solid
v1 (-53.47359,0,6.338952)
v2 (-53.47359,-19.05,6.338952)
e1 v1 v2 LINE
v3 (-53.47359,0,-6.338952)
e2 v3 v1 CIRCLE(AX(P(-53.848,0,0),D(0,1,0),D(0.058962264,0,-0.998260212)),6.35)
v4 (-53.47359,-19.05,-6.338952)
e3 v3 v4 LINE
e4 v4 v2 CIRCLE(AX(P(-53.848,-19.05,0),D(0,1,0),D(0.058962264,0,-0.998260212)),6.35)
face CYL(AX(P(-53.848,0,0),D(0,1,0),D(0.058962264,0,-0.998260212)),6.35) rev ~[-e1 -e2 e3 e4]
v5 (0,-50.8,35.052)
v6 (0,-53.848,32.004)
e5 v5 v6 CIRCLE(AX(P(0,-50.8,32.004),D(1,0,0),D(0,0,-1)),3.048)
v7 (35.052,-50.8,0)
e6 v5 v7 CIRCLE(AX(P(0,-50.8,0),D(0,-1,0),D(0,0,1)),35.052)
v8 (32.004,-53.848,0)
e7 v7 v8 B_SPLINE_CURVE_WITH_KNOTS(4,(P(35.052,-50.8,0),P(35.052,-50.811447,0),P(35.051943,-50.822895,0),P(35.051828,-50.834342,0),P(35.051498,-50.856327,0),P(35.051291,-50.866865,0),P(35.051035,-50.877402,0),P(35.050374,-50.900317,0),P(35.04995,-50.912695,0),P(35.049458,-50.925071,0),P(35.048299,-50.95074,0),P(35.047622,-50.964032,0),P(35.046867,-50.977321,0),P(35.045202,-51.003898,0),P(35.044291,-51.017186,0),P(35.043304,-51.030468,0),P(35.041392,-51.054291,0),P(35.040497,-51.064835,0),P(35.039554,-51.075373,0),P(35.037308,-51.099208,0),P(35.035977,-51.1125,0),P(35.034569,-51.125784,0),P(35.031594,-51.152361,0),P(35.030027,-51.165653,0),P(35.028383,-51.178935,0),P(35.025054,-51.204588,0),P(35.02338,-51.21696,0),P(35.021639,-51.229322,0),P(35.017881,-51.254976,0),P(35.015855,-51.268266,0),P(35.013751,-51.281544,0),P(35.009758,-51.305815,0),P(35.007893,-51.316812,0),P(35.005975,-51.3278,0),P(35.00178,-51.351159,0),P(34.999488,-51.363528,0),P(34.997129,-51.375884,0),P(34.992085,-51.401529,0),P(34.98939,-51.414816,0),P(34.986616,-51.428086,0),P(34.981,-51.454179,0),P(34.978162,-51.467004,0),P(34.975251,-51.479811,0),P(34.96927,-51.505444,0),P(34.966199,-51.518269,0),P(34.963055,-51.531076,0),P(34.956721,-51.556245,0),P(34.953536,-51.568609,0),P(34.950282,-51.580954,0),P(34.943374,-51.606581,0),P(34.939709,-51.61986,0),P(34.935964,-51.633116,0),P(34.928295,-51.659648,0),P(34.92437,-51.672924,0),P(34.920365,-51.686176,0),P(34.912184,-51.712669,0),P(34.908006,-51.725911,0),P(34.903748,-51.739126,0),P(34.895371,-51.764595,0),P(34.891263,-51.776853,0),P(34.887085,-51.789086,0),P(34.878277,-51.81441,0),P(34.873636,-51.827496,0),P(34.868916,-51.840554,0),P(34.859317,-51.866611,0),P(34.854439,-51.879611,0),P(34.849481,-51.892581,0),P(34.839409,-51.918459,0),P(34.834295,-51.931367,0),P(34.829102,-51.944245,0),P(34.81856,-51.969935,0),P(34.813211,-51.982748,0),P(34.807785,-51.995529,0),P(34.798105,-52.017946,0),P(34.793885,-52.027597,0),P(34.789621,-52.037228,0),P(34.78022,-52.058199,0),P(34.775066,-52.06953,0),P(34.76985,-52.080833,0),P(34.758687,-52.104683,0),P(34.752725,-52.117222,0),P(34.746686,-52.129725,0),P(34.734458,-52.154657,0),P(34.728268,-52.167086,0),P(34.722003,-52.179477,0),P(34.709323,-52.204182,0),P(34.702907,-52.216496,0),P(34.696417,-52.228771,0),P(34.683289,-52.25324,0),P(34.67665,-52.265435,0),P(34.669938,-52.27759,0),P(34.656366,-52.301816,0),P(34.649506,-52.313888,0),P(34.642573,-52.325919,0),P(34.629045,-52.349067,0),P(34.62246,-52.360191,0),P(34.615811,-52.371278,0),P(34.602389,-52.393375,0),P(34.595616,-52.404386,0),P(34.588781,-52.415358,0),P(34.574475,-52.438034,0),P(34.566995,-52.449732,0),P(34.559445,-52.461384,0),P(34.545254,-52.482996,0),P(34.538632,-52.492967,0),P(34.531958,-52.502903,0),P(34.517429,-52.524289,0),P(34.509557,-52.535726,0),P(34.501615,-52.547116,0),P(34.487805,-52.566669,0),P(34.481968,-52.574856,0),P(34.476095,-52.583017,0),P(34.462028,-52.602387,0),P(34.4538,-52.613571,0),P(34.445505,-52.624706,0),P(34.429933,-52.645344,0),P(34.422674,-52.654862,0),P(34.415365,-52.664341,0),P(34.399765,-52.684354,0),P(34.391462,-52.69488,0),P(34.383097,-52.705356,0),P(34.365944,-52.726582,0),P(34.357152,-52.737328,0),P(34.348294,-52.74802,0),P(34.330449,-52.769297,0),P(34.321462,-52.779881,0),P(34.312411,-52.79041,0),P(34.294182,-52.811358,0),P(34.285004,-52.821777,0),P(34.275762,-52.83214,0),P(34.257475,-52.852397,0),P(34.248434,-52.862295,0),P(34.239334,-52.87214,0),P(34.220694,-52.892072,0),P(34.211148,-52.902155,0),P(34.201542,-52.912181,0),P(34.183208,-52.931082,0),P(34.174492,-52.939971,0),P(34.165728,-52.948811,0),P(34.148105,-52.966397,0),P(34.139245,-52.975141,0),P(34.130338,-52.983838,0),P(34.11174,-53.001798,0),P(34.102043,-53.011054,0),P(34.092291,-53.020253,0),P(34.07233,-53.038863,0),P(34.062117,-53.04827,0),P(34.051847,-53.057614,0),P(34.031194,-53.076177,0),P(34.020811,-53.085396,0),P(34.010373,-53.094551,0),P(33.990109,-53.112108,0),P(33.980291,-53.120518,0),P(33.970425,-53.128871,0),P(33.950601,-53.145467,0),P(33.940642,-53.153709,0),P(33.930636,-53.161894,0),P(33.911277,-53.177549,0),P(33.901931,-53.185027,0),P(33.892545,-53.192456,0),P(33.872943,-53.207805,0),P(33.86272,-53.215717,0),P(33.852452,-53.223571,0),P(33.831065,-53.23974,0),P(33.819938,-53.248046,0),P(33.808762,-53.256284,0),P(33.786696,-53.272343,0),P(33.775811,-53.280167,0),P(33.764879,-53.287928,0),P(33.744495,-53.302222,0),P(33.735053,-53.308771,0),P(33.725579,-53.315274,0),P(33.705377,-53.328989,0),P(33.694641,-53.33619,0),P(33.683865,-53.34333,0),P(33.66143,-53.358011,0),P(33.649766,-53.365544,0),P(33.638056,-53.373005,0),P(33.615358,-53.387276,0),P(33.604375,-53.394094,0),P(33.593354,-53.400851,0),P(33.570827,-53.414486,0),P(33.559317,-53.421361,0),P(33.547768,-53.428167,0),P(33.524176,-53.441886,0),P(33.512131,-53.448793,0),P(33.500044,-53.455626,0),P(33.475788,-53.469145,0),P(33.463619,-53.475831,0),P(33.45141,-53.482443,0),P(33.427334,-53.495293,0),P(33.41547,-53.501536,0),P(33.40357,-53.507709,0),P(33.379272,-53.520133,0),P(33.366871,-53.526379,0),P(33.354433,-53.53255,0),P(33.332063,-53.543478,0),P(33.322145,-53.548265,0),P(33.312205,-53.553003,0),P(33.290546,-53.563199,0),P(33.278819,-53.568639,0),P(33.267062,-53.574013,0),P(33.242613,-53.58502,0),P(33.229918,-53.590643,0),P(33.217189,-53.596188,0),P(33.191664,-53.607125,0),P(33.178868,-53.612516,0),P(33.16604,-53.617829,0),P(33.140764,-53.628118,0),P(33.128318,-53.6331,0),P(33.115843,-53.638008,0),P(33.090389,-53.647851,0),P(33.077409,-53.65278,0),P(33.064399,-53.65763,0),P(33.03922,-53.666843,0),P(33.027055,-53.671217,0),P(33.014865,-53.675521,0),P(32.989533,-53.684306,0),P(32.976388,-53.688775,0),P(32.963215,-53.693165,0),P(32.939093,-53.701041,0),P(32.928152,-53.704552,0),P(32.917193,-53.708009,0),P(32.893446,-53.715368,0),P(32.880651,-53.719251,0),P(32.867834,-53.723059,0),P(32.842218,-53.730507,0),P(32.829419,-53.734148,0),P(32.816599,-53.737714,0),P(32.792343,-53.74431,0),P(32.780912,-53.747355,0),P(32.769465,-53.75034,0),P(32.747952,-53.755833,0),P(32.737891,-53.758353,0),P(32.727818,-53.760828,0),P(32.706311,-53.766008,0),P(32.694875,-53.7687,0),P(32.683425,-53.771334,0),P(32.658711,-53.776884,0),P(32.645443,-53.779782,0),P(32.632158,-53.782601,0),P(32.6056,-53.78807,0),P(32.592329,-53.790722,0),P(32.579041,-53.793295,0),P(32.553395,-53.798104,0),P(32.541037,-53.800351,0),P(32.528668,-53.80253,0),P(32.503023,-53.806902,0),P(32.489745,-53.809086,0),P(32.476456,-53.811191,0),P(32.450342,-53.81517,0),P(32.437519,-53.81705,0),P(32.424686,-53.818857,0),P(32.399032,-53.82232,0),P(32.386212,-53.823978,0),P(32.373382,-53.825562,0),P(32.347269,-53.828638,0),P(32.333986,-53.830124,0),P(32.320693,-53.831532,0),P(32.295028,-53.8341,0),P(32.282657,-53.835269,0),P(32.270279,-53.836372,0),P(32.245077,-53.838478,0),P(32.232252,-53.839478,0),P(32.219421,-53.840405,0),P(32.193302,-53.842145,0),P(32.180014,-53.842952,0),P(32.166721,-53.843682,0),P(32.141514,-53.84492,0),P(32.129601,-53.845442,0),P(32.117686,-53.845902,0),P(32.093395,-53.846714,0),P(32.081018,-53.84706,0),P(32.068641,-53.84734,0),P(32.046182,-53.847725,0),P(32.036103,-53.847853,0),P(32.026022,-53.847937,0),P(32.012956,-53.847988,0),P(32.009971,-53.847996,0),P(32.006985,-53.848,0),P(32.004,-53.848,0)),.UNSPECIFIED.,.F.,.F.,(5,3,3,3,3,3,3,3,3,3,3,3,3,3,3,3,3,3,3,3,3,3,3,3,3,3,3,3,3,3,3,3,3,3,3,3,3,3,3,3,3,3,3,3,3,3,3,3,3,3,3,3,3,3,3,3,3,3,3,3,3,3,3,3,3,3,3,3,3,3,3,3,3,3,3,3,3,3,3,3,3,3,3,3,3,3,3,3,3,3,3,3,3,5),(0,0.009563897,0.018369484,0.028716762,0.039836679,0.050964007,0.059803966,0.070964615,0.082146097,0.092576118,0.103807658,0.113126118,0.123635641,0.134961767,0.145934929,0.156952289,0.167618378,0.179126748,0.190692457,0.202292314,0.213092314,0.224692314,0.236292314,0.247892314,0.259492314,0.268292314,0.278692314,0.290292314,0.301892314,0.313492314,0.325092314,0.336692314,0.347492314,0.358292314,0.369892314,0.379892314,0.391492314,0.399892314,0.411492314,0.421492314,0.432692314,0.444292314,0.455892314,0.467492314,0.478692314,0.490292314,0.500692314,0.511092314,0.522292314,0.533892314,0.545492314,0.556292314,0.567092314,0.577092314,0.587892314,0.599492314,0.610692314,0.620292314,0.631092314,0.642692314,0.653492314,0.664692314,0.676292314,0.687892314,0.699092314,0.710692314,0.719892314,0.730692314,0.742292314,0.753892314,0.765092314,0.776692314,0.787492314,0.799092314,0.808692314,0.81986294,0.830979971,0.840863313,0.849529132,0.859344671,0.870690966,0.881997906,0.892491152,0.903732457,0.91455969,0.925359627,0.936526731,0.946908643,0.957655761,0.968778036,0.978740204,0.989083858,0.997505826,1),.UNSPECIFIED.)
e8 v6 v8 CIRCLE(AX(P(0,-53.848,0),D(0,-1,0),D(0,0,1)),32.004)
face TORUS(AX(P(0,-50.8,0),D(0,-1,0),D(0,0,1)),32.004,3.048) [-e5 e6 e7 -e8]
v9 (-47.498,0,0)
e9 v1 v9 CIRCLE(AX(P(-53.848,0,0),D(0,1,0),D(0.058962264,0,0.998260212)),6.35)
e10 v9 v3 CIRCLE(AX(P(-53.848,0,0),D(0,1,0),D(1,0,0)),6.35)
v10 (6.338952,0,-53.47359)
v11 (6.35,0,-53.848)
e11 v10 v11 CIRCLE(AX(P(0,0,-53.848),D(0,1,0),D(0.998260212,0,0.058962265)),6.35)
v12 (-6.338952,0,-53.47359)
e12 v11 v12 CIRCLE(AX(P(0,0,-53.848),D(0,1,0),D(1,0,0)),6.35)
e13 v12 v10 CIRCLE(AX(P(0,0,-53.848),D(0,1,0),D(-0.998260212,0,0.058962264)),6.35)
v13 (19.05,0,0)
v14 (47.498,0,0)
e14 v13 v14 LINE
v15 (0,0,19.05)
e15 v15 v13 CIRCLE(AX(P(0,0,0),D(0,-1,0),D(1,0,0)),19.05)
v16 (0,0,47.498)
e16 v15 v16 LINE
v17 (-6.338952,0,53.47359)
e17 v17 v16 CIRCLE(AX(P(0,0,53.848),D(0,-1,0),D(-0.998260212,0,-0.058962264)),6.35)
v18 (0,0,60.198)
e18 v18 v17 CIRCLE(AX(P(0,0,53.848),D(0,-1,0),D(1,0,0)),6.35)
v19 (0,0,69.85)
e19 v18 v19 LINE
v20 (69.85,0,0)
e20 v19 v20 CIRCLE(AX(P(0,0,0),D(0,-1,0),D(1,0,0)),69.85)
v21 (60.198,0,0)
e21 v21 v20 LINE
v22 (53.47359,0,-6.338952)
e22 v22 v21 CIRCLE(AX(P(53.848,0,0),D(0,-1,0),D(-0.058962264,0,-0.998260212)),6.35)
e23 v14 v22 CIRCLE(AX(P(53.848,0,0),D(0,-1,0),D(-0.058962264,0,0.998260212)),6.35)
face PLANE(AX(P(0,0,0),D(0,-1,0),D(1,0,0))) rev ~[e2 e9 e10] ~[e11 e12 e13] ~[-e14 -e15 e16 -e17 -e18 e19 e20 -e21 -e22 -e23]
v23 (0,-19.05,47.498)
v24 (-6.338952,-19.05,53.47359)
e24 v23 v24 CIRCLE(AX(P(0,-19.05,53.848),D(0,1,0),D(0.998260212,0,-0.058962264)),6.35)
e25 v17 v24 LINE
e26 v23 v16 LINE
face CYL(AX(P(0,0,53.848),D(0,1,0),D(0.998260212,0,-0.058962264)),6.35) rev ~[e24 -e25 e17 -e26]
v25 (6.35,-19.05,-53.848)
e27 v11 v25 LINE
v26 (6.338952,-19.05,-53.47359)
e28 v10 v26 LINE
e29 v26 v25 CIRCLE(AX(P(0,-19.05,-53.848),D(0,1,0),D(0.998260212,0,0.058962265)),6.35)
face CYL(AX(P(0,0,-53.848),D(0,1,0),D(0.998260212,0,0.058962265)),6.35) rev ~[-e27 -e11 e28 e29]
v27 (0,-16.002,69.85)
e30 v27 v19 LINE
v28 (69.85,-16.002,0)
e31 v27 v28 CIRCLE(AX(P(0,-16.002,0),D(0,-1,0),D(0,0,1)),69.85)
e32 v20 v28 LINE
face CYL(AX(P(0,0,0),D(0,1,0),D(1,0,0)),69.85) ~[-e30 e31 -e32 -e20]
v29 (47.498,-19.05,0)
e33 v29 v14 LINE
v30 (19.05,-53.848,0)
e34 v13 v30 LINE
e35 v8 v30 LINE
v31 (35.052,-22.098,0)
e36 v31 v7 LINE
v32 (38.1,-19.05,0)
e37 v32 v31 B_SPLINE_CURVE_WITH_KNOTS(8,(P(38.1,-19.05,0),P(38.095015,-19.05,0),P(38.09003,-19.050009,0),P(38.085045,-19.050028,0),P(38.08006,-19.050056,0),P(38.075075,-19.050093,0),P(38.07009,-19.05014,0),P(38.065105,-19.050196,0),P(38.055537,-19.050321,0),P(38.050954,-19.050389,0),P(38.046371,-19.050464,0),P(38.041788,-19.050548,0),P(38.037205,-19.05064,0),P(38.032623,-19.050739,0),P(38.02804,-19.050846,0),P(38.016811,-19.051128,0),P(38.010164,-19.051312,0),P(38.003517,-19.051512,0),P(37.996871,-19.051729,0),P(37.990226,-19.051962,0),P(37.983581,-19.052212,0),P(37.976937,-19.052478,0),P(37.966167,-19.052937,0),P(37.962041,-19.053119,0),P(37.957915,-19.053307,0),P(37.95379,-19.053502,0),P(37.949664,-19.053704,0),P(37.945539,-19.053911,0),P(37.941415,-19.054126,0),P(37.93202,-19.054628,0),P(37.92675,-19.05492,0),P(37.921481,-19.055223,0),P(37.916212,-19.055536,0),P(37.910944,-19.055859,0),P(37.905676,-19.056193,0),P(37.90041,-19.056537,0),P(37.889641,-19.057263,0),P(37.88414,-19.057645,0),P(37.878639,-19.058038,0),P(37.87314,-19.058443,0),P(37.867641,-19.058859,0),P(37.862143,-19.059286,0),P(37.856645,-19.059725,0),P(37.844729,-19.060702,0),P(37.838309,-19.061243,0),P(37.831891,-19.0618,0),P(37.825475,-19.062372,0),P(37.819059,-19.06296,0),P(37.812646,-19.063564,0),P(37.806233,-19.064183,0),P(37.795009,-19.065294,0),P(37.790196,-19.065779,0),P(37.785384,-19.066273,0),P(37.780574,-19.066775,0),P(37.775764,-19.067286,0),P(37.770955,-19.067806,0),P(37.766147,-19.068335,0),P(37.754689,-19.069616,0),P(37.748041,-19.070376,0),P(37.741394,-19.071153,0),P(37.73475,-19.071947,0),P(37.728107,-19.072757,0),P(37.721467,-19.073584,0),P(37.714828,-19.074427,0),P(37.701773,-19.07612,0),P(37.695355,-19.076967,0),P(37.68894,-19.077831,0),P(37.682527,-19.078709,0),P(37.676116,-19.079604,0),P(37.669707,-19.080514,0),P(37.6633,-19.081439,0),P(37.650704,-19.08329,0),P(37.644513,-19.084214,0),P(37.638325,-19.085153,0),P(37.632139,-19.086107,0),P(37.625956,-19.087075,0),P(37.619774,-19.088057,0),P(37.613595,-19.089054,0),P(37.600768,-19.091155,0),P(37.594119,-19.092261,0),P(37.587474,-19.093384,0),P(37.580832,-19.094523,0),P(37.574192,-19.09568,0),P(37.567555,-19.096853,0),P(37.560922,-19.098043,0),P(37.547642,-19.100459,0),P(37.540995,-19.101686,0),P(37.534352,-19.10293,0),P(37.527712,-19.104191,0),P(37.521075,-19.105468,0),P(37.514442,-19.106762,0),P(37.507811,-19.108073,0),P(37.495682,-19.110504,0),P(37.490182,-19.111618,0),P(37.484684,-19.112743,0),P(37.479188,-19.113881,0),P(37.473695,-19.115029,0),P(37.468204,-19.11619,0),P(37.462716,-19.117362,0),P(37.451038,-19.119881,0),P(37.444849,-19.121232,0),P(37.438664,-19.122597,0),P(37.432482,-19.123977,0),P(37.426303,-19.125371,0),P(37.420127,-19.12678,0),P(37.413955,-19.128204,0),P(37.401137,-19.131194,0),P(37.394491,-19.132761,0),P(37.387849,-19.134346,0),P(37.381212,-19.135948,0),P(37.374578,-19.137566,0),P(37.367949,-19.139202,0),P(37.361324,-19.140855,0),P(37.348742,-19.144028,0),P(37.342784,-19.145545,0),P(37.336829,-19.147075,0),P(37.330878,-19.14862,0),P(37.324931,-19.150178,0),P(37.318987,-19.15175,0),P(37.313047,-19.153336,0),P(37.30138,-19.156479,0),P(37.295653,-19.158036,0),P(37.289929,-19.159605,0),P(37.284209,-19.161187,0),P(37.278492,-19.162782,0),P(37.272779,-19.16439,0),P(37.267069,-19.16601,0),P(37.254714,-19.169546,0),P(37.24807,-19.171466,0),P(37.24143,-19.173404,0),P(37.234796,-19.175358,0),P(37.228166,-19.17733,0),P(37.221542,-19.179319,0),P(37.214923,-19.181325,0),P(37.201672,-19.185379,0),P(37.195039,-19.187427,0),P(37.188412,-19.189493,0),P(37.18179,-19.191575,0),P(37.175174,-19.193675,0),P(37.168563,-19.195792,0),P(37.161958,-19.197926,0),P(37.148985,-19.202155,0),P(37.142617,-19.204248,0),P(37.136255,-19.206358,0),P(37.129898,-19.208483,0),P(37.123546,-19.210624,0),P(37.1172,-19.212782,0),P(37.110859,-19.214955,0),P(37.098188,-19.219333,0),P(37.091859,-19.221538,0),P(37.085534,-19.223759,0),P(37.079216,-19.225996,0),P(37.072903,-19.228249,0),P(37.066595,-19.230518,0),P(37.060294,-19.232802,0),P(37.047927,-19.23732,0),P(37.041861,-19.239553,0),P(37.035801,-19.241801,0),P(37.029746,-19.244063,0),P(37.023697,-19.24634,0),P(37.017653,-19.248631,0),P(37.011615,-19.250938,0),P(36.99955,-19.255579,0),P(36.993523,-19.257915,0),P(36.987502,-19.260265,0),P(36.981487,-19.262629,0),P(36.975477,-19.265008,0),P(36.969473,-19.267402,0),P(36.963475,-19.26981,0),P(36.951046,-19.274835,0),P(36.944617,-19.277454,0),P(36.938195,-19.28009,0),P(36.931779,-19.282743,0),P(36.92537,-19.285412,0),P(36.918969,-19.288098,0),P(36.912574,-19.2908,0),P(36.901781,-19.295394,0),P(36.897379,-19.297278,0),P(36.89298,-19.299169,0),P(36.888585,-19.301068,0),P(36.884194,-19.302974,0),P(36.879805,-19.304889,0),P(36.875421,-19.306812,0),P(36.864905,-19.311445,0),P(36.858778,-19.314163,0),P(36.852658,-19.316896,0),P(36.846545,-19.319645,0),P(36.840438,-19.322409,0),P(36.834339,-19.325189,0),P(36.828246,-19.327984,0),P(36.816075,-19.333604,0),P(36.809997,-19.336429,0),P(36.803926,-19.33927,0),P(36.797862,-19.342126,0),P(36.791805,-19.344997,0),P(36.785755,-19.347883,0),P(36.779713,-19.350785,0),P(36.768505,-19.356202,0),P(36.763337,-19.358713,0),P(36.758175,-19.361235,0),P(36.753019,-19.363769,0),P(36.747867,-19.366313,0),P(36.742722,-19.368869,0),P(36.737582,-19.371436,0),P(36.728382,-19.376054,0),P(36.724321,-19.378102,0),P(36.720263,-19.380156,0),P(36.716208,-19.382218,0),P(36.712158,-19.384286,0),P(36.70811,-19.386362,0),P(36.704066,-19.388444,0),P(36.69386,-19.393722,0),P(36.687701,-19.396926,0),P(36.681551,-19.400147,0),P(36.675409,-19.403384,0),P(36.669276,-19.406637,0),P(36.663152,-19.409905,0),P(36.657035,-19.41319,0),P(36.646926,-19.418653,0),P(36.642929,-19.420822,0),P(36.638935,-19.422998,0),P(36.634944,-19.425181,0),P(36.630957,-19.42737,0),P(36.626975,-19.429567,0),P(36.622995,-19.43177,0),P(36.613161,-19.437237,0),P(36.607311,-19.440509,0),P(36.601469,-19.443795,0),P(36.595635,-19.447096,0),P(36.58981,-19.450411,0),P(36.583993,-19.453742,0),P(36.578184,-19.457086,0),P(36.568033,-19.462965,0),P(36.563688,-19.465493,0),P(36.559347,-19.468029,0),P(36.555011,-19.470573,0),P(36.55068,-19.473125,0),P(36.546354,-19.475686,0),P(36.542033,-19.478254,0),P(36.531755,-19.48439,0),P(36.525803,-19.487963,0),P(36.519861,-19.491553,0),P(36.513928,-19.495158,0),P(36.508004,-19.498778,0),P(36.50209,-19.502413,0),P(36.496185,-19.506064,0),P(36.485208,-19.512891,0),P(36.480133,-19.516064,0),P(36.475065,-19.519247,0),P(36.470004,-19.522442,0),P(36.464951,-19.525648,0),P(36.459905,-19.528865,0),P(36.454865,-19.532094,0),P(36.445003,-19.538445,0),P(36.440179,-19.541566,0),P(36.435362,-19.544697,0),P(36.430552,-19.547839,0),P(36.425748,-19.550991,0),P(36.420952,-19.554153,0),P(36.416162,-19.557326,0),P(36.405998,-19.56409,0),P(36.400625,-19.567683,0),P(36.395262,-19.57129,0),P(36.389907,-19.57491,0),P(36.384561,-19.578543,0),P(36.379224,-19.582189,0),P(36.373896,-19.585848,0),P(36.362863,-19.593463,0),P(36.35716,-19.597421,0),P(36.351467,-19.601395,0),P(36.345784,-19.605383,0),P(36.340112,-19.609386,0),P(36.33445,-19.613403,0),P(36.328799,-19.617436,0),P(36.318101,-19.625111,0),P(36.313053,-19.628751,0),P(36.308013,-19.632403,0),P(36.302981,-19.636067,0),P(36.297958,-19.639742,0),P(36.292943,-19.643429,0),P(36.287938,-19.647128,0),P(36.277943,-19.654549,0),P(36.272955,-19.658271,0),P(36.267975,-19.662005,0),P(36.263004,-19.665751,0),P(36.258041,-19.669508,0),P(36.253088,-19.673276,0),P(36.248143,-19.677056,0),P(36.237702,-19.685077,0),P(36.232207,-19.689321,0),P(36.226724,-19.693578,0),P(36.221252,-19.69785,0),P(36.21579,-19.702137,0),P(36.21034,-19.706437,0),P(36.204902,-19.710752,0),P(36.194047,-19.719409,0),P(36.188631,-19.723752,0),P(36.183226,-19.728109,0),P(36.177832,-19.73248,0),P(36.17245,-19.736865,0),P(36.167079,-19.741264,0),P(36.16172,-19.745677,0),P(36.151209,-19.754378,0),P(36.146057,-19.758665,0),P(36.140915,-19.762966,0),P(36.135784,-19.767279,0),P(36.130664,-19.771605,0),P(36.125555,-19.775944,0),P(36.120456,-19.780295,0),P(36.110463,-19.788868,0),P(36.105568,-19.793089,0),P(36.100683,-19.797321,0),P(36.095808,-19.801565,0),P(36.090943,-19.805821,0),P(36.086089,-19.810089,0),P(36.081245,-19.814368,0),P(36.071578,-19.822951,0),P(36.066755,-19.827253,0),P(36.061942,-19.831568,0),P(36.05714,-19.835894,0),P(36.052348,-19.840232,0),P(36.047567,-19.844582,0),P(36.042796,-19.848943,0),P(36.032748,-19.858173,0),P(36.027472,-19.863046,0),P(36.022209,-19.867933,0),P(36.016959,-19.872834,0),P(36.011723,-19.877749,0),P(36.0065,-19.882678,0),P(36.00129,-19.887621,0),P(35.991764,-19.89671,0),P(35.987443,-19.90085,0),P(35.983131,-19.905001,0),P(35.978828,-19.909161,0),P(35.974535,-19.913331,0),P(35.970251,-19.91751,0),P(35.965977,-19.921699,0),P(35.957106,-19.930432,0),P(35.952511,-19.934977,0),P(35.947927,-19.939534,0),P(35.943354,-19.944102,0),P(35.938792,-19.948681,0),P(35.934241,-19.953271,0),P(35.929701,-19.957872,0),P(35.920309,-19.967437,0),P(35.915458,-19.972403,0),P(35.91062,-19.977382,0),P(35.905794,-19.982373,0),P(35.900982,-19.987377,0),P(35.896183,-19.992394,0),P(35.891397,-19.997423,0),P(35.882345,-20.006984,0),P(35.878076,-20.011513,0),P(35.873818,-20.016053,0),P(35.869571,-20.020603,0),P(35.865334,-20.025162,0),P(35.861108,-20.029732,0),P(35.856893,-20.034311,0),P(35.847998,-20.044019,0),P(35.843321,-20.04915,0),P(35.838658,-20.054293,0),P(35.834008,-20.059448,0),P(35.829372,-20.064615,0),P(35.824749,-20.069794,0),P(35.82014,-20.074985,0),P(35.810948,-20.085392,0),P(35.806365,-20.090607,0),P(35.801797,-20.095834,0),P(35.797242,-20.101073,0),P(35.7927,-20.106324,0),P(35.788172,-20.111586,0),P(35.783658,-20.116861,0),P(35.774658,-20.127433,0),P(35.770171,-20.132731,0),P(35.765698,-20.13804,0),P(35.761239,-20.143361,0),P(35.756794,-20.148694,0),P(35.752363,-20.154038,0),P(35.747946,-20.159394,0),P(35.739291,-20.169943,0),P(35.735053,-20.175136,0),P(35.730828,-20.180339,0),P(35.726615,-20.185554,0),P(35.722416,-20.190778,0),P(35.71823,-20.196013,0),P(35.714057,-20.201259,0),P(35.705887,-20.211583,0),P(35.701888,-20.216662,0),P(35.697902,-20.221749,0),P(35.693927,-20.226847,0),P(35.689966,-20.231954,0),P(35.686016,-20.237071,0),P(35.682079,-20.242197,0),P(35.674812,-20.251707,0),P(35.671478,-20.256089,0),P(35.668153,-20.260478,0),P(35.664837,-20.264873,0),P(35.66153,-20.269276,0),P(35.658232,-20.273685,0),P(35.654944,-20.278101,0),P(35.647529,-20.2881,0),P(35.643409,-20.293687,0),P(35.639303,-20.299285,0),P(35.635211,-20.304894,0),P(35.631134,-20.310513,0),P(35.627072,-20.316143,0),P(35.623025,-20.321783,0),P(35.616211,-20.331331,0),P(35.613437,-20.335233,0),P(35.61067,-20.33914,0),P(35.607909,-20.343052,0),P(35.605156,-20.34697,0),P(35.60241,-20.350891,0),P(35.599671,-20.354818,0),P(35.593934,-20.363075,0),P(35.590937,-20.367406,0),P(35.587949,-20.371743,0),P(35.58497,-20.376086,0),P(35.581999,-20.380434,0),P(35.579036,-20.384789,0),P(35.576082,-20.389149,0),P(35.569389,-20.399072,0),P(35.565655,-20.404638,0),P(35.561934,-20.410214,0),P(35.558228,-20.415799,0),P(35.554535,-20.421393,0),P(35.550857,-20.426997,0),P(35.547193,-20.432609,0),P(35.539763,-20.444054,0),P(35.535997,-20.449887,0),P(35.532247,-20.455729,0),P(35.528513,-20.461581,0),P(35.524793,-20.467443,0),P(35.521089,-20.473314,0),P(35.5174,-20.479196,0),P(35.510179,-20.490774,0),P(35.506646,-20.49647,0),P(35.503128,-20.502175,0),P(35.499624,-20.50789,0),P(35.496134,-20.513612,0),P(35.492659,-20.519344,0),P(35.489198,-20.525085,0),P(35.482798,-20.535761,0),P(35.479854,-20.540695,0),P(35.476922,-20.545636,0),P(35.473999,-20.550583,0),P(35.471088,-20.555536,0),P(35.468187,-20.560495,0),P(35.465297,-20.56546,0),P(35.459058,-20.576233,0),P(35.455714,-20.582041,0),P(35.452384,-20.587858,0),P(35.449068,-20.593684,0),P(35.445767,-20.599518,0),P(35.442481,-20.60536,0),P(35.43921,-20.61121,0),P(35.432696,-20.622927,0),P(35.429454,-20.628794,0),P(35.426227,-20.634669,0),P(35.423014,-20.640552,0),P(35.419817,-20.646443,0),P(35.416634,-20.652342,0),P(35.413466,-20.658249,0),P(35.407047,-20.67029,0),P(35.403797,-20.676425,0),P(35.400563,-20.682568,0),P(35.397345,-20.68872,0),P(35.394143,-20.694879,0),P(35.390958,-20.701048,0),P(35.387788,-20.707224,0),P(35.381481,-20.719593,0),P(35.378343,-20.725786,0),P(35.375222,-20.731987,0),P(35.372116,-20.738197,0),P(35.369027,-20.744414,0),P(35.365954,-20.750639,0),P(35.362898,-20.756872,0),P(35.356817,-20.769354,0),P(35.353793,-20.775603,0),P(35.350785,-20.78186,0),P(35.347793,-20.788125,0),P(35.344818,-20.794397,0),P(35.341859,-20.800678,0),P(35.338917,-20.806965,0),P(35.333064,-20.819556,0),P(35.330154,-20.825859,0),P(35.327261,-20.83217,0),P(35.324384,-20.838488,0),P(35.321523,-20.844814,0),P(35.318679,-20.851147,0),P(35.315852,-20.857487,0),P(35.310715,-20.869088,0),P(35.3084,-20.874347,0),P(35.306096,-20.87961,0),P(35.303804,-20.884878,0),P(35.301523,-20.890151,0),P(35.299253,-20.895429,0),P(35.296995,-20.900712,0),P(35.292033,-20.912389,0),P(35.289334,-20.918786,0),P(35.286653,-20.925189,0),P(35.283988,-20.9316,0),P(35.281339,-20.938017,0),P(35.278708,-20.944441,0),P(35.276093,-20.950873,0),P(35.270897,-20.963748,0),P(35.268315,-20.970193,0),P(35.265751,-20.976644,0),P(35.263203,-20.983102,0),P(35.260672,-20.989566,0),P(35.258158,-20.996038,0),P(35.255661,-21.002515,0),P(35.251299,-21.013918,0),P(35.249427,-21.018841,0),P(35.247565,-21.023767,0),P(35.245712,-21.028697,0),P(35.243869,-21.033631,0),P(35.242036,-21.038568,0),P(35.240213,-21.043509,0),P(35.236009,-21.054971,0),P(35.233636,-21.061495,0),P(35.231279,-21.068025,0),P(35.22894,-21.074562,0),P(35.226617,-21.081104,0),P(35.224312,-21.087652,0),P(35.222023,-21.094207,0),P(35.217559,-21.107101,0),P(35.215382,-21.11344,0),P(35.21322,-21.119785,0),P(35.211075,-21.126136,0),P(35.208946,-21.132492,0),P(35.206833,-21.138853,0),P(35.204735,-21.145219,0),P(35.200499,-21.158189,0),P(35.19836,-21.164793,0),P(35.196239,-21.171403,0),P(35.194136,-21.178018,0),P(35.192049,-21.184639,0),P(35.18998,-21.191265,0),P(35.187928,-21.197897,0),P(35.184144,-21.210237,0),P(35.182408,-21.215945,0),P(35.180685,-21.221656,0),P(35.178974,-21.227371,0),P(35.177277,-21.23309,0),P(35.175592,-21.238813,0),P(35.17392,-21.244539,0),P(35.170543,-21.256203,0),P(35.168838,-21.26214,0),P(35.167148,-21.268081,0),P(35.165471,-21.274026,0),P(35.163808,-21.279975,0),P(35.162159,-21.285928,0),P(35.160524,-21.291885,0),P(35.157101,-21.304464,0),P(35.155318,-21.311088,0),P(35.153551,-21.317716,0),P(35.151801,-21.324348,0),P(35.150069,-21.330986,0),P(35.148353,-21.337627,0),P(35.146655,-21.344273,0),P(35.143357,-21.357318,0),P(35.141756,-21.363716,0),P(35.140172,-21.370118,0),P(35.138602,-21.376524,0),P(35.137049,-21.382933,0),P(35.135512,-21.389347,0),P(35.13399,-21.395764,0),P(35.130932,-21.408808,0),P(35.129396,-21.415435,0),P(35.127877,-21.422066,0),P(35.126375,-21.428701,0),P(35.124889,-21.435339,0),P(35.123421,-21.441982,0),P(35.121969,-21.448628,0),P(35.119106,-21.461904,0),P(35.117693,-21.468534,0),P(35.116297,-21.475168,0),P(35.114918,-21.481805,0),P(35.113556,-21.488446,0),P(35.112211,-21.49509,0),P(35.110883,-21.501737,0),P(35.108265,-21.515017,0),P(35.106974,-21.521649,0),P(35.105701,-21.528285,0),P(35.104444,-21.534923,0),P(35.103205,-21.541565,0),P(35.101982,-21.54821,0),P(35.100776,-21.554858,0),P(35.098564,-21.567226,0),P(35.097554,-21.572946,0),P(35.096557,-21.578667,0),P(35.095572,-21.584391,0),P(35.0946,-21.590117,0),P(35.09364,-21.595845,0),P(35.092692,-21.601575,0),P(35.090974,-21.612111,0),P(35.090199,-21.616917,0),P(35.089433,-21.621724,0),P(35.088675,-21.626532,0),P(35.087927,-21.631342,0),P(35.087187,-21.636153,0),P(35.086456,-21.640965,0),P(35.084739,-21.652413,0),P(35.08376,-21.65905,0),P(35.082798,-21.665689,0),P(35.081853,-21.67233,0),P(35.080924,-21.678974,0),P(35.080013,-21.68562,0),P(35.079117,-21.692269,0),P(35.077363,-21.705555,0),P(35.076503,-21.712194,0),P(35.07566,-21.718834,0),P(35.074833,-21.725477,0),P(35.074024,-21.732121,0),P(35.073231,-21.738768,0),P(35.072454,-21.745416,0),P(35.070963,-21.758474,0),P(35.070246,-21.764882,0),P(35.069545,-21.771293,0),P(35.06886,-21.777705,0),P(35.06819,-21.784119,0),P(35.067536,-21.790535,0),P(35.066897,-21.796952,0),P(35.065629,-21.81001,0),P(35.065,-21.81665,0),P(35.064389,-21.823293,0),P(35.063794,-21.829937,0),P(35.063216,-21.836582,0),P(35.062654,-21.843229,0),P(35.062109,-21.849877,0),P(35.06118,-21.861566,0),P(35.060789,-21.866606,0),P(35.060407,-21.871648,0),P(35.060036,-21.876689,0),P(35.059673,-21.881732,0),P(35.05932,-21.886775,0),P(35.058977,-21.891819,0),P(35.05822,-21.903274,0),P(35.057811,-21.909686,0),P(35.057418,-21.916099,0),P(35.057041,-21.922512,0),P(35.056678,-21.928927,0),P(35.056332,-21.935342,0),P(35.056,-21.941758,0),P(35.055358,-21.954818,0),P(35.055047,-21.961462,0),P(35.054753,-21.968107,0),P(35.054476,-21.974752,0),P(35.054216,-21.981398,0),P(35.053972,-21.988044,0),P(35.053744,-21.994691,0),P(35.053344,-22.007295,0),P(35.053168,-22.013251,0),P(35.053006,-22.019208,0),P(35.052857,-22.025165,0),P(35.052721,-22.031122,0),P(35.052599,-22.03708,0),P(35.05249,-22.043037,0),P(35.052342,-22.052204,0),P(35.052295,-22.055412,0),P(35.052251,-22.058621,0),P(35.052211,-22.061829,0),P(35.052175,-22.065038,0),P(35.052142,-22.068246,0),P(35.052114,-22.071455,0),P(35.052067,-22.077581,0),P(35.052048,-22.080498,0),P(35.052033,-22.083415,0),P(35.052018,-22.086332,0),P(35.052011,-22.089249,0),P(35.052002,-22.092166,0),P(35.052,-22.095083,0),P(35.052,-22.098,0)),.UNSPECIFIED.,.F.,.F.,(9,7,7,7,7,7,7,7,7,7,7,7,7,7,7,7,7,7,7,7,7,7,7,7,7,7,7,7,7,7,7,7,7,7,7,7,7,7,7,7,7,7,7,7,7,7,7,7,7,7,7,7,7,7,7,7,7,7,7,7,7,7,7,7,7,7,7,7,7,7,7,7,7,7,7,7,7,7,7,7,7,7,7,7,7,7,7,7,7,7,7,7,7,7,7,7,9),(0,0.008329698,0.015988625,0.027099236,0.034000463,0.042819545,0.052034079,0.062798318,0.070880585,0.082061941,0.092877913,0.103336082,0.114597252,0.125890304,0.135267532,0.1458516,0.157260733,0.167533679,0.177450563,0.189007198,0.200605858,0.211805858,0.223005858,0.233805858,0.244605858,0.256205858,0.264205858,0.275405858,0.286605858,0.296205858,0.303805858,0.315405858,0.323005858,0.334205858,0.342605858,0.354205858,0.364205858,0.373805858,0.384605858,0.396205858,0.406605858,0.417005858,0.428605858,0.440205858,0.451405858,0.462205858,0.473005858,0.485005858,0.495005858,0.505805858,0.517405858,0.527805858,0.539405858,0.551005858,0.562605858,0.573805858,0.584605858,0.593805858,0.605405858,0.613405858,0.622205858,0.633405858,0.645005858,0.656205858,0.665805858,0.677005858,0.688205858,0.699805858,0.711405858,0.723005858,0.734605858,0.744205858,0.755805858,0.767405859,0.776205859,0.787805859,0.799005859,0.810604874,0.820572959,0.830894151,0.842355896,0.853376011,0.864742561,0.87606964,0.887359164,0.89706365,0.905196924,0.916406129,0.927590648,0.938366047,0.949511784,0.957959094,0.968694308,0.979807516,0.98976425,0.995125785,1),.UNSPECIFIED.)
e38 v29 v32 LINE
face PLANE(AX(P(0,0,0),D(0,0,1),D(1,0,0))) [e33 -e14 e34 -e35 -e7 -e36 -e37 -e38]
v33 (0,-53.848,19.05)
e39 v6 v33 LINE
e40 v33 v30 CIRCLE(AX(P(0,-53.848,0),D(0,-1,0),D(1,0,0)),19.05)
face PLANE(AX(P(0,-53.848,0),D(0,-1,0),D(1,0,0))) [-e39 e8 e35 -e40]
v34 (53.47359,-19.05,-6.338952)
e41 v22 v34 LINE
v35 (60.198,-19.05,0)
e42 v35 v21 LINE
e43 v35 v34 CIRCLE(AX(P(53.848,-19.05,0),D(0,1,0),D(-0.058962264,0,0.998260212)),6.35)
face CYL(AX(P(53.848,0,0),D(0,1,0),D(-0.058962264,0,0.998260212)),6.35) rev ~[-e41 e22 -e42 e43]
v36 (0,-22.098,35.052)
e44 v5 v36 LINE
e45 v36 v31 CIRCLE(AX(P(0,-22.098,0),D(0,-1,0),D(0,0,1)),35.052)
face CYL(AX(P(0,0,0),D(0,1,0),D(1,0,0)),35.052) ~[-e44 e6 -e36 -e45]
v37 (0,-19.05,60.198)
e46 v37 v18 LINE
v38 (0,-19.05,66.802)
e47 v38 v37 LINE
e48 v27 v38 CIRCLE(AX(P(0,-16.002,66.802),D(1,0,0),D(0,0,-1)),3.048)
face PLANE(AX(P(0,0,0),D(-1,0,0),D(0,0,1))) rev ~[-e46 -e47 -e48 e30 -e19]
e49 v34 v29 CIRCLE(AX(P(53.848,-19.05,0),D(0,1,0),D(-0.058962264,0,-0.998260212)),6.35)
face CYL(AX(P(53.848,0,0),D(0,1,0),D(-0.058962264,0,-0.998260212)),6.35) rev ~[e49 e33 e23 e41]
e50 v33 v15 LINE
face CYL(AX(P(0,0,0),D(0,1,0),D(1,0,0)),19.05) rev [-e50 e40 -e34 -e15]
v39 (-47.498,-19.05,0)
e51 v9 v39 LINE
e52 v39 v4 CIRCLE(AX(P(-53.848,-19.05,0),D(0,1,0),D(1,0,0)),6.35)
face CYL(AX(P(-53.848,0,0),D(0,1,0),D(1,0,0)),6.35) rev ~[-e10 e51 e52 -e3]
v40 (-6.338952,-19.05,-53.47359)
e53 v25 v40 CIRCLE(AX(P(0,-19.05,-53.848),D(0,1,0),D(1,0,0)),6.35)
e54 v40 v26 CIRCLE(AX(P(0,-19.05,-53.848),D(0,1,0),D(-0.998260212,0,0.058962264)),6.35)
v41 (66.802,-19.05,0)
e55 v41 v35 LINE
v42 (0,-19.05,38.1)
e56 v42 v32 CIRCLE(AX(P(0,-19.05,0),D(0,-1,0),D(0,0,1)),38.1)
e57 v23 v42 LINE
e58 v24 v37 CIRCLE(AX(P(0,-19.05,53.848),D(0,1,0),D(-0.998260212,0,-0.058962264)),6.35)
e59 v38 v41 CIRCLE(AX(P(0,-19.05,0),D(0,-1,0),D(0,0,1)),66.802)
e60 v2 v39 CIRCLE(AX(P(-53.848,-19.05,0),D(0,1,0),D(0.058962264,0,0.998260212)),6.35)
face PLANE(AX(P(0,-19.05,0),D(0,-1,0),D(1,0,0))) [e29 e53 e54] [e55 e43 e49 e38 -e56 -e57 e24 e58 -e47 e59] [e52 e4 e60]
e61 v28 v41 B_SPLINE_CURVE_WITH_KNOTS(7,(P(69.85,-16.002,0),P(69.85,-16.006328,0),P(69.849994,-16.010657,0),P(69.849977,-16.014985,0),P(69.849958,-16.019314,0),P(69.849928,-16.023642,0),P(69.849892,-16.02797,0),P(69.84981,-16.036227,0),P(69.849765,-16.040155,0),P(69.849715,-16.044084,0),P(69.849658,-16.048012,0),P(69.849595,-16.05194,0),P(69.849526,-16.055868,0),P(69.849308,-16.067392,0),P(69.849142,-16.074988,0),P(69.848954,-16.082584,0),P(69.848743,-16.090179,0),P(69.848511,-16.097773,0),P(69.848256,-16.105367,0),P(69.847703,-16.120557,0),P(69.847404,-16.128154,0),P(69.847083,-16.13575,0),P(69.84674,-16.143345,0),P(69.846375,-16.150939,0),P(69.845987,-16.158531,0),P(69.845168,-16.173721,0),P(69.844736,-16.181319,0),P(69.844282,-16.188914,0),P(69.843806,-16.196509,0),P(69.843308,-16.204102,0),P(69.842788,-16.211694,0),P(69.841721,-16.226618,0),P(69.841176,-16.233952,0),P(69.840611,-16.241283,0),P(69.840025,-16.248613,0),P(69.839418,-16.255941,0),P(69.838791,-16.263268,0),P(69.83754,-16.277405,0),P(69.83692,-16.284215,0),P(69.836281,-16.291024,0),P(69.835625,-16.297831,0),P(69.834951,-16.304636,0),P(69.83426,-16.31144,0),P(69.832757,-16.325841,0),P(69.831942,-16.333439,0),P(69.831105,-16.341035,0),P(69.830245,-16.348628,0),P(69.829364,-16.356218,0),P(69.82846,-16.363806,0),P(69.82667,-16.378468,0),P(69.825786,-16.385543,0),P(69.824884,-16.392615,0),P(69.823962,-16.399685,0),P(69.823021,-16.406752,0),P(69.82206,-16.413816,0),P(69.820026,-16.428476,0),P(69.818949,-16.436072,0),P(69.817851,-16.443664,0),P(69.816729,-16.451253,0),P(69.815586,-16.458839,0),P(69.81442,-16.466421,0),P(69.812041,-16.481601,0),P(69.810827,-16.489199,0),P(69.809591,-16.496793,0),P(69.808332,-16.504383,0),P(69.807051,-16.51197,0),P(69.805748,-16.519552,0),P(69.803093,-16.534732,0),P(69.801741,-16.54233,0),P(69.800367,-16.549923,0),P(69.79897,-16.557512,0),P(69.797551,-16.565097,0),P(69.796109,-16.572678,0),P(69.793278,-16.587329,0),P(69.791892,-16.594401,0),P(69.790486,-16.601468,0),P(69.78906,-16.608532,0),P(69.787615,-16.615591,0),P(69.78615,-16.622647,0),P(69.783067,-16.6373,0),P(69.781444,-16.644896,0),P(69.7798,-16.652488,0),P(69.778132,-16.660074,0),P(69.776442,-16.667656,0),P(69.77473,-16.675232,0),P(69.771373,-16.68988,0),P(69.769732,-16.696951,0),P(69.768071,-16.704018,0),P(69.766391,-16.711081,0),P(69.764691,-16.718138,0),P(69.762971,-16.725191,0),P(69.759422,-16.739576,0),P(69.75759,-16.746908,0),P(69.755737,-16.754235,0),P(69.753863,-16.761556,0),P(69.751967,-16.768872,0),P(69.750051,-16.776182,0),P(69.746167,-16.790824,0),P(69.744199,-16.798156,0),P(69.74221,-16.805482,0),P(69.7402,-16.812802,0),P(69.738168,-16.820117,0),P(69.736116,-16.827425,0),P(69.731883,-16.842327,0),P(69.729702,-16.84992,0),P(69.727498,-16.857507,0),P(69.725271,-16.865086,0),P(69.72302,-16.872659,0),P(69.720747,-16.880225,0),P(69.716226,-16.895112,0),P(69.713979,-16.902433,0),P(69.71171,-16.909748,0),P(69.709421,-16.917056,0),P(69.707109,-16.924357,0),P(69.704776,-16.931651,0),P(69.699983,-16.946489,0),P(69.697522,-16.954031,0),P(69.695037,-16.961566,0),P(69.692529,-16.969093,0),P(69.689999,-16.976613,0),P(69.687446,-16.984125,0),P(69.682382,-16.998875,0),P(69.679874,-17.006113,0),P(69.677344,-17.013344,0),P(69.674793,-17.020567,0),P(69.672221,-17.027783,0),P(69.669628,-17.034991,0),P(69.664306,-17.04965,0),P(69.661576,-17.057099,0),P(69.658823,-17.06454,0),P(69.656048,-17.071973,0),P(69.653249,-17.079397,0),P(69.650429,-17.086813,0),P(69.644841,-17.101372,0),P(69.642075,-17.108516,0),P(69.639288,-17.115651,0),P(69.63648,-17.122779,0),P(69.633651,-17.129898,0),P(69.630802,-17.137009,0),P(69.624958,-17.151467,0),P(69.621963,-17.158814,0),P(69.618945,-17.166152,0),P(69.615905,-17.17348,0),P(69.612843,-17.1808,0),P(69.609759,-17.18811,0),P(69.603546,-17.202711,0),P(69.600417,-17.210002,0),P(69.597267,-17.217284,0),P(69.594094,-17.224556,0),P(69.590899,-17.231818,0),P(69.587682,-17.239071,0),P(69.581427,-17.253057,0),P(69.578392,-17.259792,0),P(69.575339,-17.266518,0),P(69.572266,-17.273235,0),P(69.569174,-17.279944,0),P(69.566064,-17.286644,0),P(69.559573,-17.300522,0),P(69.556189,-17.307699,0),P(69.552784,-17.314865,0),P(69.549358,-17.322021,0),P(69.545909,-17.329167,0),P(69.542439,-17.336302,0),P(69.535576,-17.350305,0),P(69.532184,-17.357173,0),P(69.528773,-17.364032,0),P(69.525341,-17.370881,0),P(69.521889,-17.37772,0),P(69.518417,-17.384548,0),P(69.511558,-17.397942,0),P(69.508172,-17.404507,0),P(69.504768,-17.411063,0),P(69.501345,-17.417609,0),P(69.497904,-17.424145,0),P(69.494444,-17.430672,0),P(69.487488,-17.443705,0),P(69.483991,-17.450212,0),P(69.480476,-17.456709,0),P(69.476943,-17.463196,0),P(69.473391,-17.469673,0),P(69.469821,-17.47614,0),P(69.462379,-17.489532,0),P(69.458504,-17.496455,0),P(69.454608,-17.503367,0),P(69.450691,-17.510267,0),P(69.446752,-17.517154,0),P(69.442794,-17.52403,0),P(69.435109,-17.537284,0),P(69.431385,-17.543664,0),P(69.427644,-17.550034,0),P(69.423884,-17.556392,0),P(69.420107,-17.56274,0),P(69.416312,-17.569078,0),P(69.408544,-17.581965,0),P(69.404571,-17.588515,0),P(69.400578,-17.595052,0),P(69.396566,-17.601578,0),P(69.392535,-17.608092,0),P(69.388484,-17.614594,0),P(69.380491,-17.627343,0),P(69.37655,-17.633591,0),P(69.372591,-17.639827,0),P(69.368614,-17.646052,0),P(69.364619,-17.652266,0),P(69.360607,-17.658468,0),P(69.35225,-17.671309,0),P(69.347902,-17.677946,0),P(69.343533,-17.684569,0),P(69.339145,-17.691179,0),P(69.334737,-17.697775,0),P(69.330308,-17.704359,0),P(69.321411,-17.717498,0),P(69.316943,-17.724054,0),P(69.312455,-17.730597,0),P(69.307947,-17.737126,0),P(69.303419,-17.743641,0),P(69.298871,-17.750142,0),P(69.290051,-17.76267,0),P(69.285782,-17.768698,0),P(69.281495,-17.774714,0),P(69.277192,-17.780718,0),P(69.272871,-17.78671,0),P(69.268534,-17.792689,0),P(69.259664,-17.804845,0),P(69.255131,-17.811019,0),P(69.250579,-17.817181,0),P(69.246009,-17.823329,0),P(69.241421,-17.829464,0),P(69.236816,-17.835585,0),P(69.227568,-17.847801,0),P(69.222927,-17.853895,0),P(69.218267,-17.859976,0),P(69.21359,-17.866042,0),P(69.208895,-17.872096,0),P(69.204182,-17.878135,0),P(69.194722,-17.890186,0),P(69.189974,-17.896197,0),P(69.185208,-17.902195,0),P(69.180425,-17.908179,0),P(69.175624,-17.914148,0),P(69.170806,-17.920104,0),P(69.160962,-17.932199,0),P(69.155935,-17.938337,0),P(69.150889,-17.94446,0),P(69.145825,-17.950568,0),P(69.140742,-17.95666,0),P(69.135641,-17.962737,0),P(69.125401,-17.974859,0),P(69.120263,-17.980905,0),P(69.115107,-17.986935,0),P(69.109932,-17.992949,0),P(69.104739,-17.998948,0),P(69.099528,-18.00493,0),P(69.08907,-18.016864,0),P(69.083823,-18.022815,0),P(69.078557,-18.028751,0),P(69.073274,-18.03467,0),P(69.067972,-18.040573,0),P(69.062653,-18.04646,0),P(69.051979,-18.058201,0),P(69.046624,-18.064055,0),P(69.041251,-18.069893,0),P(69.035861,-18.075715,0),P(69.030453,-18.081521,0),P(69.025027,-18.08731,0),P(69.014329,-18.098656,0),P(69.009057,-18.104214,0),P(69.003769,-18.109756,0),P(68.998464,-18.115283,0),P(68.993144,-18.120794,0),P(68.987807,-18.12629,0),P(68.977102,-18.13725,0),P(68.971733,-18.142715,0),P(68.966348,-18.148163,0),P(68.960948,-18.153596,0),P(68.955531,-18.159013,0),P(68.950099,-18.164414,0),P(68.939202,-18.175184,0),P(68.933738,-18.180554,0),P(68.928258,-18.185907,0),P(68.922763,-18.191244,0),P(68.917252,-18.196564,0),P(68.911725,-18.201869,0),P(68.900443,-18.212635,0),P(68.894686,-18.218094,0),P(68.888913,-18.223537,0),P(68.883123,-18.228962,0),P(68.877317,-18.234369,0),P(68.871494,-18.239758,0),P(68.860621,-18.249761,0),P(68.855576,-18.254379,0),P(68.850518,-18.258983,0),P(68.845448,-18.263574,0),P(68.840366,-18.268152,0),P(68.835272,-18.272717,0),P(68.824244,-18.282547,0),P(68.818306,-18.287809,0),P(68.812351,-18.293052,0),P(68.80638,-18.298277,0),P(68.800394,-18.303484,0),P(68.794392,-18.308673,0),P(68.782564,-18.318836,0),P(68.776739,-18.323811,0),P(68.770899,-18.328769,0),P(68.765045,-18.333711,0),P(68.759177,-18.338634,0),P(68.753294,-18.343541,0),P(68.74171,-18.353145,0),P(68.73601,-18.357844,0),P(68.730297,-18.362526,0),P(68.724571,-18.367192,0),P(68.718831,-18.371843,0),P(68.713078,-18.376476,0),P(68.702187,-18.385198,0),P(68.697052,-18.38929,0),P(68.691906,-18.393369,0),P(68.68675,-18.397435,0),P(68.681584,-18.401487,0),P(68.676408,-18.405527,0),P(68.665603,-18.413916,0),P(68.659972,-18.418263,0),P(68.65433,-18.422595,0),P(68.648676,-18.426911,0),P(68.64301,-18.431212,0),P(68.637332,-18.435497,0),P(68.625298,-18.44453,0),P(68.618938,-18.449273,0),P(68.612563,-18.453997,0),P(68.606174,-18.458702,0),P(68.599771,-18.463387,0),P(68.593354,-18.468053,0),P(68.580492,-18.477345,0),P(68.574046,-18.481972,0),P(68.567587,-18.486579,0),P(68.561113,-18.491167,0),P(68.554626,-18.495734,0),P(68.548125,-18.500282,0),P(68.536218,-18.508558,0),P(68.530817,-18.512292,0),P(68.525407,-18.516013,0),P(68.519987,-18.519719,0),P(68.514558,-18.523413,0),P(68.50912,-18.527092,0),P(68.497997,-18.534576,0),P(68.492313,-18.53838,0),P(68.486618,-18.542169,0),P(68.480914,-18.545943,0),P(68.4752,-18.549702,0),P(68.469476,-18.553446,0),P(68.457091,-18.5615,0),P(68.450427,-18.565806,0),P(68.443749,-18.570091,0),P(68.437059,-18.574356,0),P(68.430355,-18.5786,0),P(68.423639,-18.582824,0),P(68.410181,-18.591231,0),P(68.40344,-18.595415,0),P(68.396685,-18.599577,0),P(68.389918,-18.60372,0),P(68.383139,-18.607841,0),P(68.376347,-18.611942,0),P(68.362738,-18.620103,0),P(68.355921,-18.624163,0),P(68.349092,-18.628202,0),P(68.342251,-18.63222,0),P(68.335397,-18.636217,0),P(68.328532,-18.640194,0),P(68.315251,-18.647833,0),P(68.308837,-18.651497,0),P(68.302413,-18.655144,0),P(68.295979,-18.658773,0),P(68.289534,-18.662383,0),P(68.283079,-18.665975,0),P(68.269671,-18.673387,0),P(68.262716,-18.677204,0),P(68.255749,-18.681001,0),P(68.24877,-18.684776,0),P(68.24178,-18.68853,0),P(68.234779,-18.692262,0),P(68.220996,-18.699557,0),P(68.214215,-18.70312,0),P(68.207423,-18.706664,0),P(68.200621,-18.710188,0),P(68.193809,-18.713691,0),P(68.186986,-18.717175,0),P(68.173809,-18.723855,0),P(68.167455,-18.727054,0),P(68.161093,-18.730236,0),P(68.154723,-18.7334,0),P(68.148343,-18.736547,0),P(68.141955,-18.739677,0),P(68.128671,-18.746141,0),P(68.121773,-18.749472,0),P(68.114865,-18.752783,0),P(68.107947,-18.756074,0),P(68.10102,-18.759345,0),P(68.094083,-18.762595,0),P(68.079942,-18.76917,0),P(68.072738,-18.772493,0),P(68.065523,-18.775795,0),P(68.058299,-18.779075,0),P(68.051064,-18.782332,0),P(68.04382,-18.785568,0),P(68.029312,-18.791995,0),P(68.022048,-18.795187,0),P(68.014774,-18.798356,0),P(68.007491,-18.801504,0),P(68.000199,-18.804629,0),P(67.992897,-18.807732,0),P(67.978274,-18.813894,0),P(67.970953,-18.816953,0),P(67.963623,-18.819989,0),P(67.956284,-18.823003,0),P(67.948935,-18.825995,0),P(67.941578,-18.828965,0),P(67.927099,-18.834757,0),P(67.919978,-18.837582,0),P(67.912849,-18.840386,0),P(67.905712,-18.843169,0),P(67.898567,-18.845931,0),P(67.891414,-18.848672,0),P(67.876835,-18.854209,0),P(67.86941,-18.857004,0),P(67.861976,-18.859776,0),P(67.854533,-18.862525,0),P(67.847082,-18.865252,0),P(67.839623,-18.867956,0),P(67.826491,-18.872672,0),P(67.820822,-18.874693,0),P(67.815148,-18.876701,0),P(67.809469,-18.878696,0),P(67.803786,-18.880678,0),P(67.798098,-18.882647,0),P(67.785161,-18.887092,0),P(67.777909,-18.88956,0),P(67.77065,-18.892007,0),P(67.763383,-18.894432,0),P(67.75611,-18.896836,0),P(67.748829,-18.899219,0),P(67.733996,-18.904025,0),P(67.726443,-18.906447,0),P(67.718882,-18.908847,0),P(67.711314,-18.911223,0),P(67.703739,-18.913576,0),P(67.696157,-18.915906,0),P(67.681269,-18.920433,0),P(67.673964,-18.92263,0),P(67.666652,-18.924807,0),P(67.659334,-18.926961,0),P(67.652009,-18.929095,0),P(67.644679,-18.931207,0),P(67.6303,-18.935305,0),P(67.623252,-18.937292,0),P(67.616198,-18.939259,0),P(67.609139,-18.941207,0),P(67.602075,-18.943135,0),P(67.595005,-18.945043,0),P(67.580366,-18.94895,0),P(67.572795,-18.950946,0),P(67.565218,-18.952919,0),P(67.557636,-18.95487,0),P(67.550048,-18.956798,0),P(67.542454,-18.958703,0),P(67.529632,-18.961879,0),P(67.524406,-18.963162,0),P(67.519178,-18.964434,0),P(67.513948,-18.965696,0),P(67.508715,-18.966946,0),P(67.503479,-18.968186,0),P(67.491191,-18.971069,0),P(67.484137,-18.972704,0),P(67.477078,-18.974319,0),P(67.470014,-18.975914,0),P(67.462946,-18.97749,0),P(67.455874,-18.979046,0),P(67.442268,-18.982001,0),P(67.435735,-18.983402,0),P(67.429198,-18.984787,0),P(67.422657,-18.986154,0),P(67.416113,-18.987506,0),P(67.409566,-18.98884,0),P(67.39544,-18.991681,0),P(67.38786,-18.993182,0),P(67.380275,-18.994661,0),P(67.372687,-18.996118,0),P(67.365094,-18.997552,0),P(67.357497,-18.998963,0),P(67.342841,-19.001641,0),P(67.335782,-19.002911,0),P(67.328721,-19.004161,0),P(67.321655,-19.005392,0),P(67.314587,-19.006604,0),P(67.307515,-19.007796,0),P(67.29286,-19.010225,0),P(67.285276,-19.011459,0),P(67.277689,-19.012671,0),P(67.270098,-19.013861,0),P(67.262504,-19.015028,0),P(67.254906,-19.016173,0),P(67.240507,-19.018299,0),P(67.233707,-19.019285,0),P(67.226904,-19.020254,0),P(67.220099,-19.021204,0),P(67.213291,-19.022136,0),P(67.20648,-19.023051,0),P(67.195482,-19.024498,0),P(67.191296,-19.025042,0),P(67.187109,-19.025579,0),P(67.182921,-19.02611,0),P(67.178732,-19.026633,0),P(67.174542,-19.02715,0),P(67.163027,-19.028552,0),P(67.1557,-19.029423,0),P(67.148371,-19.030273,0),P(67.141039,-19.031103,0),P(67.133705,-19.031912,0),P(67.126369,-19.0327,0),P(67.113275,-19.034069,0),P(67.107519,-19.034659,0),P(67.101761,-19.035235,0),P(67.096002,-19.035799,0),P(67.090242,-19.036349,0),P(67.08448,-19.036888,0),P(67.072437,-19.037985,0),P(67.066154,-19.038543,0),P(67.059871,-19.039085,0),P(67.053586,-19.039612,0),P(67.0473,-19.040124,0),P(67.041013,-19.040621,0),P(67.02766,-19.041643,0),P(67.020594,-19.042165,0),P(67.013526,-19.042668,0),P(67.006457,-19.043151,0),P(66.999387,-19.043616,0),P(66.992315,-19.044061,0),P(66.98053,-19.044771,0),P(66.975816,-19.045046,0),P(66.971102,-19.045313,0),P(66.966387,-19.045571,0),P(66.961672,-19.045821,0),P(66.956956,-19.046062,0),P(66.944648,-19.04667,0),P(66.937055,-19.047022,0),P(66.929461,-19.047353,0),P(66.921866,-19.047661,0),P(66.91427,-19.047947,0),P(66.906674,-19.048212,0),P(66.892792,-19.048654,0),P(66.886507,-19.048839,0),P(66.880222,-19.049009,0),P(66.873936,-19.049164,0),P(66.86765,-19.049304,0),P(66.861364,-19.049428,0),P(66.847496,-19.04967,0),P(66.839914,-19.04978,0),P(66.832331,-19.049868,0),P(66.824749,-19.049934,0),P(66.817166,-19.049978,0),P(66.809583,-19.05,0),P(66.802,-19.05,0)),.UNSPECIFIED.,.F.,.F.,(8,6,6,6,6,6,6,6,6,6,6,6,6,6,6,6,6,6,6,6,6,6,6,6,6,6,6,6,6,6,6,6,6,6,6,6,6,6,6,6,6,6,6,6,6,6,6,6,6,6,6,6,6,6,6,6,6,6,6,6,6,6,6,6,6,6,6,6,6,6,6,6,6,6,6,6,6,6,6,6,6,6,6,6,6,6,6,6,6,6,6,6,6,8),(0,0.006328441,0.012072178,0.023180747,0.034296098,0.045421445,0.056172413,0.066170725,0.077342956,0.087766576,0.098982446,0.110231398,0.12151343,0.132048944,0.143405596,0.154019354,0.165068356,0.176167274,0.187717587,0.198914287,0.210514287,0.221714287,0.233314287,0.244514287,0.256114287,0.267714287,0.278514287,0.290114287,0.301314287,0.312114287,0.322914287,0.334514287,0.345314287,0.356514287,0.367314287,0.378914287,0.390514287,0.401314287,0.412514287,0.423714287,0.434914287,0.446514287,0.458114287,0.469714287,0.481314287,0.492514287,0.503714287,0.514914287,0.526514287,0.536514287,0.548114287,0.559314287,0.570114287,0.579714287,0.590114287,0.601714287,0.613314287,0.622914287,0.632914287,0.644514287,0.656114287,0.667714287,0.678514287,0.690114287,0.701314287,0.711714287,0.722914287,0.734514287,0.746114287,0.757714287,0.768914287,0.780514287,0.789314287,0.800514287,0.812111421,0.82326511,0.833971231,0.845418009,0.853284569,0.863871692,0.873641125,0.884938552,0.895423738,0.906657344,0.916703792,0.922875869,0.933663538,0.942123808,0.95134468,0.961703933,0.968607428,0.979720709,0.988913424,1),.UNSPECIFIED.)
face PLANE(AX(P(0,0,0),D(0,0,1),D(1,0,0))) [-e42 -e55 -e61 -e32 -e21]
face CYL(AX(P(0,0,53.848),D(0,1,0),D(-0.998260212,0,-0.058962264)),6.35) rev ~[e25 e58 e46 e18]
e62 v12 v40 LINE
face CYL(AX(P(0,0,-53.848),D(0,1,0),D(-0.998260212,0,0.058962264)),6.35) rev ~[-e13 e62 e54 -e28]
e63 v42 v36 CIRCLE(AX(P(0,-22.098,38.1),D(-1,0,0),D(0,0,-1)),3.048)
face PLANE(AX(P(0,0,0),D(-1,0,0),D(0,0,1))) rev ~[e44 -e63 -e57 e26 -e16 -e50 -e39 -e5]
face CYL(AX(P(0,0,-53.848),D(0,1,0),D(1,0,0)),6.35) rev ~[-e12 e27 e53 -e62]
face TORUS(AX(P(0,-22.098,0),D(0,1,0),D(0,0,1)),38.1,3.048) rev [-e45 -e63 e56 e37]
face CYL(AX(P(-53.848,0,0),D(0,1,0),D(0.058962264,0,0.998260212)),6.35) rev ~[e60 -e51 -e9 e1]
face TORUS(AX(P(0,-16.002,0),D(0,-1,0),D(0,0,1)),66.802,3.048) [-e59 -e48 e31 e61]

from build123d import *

# Parameters (mm, degrees)
F0_R     = 35.052
F0_R_2   = 19.05
F1_DEPTH = 53.848
F0_R_3   = 69.85
F2_DEPTH = 19.05
F3_W     = 73.3096525073
F3_H     = 72.7184489369
F4_DEPTH = 222
F5_W     = 74.8862102628
F5_H     = 75.4774138331
F6_DEPTH = 53.849
F7_R     = 3.048


# Not quite as in the source:
# - an extrude ends at something that could not be found from the text; its depth is read off the source's solid


with BuildPart() as f1:
    # F0 (on Front) → F1 (new body)
    with BuildSketch(Plane.XZ):
        Circle(F0_R)
        Circle(F0_R_2, mode=Mode.SUBTRACT)
    extrude(amount=F1_DEPTH)

    # F0 (on Front) → F2 (join)
    with BuildSketch(Plane.XZ):
        Circle(F0_R_3)
        with BuildLine():
            ThreePointArc((6.3389523479, 53.4735896226), (38.0762859533, 38.0762859533), (53.4735896226, 6.3389523479))
            ThreePointArc((53.4735896226, 6.3389523479), (58.2037429965, 4.6206063399), (60.198, 0))
            ThreePointArc((60.198, 0), (58.2037429965, -4.6206063399), (53.4735896226, -6.3389523479))
            ThreePointArc((53.4735896226, -6.3389523479), (38.0762859533, -38.0762859533), (6.3389523479, -53.4735896226))
            ThreePointArc((6.3389523479, -53.4735896226), (6.3472374861, -53.6607133338), (6.35, -53.848))
            ThreePointArc((6.35, -53.848), (-0.1872866662, -60.1952374861), (-6.3389523479, -53.4735896226))
            ThreePointArc((-6.3389523479, -53.4735896226), (-38.0762859533, -38.0762859533), (-53.4735896226, -6.3389523479))
            ThreePointArc((-53.4735896226, -6.3389523479), (-60.198, 0), (-53.4735896226, 6.3389523479))
            ThreePointArc((-53.4735896226, 6.3389523479), (-38.0762859533, 38.0762859533), (-6.3389523479, 53.4735896226))
            ThreePointArc((-6.3389523479, 53.4735896226), (-0.1872866662, 60.1952374861), (6.35, 53.848))
            ThreePointArc((6.35, 53.848), (6.3472374861, 53.6607133338), (6.3389523479, 53.4735896226))
        make_face(mode=Mode.SUBTRACT)
        with BuildLine():
            ThreePointArc((53.4735896226, -6.3389523479), (47.498, 0), (53.4735896226, 6.3389523479))
            ThreePointArc((53.4735896226, 6.3389523479), (38.0762859533, 38.0762859533), (6.3389523479, 53.4735896226))
            ThreePointArc((6.3389523479, 53.4735896226), (0, 47.498), (-6.3389523479, 53.4735896226))
            ThreePointArc((-6.3389523479, 53.4735896226), (-38.0762859533, 38.0762859533), (-53.4735896226, 6.3389523479))
            ThreePointArc((-53.4735896226, 6.3389523479), (-49.2273936601, 4.3557429965), (-47.498, 0))
            ThreePointArc((-47.498, 0), (-49.2273936601, -4.3557429965), (-53.4735896226, -6.3389523479))
            ThreePointArc((-53.4735896226, -6.3389523479), (-38.0762859533, -38.0762859533), (-6.3389523479, -53.4735896226))
            ThreePointArc((-6.3389523479, -53.4735896226), (0, -47.498), (6.3389523479, -53.4735896226))
            ThreePointArc((6.3389523479, -53.4735896226), (38.0762859533, -38.0762859533), (53.4735896226, -6.3389523479))
        make_face()
        Circle(F0_R, mode=Mode.SUBTRACT)
    extrude(amount=F2_DEPTH)

    # F3 (on Front) → F4 (cut, through all)
    with BuildSketch(Plane.XZ):
        with Locations((36.6548262537, 36.3592244685)):
            Rectangle(F3_W, F3_H)
    extrude(amount=-F4_DEPTH, mode=Mode.SUBTRACT)

    # F5 (on Front) → F6 (cut, through all)
    with BuildSketch(Plane.XZ):
        with Locations((37.4431051314, 37.7387069166)):
            Rectangle(F5_W, F5_H)
    extrude(amount=F6_DEPTH, mode=Mode.SUBTRACT)

    # F7
    f7_edges = [f1.edges().sort_by_distance(p)[0] for p in [
        (-24.785507, -53.848, -24.785507),
        (-24.785507, -19.05, -24.785507),
        (-49.391409, -19.05, -49.391409),
    ]]
    fillet(f7_edges, radius=F7_R)


solid = f1.part
